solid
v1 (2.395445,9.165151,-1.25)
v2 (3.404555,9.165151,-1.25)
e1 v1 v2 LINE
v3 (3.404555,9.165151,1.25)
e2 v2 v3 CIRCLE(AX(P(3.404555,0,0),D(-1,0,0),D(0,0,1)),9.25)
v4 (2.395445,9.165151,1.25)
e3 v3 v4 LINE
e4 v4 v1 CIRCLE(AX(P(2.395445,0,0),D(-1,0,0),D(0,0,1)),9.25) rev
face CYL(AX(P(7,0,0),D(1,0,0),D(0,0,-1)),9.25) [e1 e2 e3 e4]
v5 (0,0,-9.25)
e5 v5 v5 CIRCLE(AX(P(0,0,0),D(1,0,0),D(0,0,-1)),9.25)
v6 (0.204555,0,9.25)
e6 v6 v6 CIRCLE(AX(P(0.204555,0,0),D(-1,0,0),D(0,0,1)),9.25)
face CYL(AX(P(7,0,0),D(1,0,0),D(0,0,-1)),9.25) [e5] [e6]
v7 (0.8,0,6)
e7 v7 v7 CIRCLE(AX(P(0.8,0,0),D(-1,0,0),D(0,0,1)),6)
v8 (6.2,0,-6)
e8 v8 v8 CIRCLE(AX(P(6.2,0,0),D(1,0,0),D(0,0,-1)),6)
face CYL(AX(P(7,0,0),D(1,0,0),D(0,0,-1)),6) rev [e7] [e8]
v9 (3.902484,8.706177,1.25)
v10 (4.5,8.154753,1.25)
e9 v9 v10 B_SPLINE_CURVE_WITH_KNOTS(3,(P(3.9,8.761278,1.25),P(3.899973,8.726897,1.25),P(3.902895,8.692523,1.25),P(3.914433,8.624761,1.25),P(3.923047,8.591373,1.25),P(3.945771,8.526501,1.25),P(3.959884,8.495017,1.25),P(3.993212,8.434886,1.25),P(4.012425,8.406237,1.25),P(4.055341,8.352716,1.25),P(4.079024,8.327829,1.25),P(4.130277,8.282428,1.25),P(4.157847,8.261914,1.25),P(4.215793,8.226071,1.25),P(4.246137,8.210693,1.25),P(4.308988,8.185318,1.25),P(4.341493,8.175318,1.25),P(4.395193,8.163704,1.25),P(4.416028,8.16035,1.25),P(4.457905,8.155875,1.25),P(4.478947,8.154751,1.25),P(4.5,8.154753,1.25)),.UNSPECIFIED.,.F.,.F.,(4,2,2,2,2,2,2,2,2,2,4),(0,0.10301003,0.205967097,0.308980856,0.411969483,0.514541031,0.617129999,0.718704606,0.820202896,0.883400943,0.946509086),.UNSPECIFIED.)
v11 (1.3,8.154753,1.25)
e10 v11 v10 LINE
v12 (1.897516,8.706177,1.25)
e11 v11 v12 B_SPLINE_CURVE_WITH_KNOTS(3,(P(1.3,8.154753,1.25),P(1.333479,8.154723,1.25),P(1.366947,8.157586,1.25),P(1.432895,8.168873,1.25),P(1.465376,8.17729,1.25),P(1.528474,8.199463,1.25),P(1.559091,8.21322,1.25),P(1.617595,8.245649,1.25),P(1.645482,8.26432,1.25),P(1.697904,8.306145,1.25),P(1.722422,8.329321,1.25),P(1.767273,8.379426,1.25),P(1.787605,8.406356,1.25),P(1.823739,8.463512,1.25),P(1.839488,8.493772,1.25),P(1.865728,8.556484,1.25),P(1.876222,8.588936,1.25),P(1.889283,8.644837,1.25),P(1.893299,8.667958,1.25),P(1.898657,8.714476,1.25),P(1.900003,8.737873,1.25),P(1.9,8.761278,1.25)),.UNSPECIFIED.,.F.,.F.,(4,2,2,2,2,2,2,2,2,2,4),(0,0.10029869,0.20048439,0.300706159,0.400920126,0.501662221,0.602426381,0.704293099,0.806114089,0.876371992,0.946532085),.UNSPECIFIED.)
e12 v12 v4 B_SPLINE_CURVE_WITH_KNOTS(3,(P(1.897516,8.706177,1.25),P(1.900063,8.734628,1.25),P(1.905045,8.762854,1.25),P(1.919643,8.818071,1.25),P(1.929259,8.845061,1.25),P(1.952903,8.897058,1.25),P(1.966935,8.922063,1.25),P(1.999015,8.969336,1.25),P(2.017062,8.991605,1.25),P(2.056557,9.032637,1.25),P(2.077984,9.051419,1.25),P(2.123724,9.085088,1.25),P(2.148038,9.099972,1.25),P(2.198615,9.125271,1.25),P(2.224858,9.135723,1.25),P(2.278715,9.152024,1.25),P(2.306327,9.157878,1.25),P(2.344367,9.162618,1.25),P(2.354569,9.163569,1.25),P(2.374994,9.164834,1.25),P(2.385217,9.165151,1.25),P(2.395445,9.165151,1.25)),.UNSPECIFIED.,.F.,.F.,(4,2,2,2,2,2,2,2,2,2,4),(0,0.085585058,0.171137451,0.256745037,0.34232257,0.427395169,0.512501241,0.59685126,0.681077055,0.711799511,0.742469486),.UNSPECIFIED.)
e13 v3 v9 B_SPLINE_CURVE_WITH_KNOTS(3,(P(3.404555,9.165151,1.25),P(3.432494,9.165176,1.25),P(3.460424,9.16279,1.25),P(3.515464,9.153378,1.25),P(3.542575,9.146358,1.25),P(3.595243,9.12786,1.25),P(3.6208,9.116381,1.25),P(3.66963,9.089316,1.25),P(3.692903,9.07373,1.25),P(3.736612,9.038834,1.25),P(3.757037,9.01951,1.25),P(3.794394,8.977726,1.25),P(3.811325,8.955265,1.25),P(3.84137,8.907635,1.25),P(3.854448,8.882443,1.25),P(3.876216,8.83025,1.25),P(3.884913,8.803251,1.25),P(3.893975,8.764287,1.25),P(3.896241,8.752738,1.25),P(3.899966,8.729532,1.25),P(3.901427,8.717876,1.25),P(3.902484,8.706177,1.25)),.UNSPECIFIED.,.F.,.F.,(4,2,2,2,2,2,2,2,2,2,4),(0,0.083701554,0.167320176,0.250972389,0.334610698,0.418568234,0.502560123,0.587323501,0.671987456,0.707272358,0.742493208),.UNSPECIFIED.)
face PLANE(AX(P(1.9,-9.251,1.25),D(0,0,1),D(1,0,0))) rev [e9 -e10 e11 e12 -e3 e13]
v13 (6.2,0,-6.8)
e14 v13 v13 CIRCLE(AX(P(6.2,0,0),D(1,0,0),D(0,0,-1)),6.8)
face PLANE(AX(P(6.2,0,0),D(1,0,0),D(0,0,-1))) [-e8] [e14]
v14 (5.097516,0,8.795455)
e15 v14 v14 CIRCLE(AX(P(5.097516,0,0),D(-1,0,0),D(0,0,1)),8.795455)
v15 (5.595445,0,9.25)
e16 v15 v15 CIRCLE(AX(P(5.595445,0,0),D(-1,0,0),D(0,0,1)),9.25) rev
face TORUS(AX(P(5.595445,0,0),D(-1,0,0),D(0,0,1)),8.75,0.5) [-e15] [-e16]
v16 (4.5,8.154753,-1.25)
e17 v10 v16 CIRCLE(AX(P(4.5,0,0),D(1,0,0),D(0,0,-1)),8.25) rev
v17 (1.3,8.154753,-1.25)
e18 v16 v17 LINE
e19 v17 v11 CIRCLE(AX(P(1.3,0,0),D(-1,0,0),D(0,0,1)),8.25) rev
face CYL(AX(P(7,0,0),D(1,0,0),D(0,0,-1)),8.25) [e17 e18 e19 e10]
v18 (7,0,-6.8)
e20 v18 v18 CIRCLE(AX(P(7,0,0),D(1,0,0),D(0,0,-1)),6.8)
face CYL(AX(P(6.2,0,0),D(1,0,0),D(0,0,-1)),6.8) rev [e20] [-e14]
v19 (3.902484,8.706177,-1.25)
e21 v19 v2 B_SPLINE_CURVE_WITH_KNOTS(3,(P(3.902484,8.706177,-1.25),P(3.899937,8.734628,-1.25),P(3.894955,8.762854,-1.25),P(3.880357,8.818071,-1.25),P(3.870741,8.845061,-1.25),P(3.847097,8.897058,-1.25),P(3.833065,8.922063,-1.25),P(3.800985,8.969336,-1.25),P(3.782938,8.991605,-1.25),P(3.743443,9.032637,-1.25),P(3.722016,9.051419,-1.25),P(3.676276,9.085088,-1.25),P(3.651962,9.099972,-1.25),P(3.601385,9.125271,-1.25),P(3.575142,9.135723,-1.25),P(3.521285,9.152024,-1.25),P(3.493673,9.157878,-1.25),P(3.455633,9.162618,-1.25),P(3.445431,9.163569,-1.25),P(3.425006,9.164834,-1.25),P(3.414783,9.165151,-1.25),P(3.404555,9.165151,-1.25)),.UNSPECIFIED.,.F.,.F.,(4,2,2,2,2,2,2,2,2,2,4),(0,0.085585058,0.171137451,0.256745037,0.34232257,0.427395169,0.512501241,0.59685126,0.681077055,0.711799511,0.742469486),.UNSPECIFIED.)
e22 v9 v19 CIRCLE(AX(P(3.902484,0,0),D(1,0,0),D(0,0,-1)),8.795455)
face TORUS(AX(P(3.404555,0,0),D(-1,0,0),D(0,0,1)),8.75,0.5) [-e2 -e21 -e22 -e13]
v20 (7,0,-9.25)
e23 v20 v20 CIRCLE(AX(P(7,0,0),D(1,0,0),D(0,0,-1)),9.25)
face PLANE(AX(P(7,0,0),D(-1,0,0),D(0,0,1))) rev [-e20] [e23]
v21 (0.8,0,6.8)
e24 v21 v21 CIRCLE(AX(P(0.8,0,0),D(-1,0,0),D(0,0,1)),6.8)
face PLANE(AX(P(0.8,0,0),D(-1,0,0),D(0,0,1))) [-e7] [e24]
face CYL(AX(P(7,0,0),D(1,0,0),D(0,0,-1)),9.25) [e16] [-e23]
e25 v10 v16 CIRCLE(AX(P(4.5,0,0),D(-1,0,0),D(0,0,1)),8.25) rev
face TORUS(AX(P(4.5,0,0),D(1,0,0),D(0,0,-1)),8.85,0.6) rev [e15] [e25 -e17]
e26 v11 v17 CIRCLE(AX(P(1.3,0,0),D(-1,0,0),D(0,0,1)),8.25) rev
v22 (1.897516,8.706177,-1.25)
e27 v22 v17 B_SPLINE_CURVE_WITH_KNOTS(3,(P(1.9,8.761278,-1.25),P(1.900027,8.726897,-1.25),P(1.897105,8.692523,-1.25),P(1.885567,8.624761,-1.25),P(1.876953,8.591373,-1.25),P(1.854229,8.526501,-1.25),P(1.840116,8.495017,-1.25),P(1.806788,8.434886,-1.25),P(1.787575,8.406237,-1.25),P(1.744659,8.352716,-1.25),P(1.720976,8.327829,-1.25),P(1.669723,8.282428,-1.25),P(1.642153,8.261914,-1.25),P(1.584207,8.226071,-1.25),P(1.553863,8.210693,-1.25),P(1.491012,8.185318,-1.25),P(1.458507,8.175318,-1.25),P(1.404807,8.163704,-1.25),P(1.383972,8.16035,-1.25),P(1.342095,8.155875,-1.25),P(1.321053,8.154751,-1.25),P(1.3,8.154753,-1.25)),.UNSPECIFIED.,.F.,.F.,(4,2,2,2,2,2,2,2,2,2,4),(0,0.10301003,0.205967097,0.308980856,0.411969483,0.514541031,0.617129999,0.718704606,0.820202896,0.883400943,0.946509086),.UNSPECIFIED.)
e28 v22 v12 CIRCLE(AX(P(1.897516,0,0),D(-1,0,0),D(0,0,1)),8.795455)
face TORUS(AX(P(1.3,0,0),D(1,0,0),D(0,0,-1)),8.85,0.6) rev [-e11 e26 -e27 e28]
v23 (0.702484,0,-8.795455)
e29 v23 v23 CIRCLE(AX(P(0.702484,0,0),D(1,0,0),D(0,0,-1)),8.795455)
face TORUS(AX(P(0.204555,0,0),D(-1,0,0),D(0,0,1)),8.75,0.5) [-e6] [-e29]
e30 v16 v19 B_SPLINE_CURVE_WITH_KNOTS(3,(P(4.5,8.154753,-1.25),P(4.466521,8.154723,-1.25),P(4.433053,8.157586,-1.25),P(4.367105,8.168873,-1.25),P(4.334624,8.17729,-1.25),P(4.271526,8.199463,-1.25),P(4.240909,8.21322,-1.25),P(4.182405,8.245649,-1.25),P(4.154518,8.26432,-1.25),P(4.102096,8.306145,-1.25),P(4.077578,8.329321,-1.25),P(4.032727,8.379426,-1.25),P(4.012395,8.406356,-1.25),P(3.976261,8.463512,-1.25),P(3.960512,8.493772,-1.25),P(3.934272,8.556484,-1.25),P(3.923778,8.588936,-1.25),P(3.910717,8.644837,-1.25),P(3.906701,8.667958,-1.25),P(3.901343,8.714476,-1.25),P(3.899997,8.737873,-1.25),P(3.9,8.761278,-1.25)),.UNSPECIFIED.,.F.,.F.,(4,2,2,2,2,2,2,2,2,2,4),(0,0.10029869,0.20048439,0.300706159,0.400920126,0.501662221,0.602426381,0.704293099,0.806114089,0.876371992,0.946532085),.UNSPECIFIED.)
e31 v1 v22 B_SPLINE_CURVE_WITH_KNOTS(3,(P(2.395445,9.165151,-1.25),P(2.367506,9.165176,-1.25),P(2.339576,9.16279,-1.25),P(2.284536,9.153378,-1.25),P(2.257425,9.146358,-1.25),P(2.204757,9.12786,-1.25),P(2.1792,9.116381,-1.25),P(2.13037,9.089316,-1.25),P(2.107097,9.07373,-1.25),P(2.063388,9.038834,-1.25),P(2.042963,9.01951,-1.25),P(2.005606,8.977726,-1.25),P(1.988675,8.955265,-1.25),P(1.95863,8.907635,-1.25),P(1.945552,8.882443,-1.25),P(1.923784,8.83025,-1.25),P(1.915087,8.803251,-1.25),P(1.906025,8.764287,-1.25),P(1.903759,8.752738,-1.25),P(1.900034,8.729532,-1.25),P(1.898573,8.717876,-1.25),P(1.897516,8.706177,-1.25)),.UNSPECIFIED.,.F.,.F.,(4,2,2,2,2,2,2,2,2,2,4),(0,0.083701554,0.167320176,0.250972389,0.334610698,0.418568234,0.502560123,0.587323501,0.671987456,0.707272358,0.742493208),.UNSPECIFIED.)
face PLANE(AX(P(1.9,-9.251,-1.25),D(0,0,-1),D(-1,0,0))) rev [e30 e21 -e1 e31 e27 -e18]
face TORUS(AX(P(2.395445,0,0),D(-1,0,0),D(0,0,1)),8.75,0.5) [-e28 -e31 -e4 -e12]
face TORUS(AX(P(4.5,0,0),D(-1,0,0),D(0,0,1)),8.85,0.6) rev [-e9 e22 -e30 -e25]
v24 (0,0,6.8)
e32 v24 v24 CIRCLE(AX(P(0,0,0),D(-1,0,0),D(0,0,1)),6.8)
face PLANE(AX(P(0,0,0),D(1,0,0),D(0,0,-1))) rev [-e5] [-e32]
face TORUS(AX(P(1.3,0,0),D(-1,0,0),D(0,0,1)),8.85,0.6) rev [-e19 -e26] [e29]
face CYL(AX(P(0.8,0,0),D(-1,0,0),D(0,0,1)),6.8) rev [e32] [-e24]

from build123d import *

# Parameters (mm, degrees)
CUT_EXTRUDE3_REACH      = 24.475
CUT_EXTRUDE3_END_RADIUS = 8.25
SKETCH7_W               = 2
SKETCH7_H               = 2.5
FILLET1_R               = 0.6
SKETCH3_R               = 6.8
CUT_EXTRUDE1_DEPTH      = 0.8
CUT_EXTRUDE2_START      = -0.8
SKETCH4_R               = 6.8
CUT_EXTRUDE2_DEPTH      = 0.8
FILLET2_R               = 0.5


with BuildPart() as part:
    # Sketch2 → Revolve1 (revolve)
    with BuildSketch(Plane(origin=(0, 0, 0), x_dir=(1, 0, 0), z_dir=(0, 1, 0))):
        Polygon((7, 9.25), (7, 6), (0, 6), (0, 9.25), (0.7, 9.25), (0.7, 8.25), (1.9, 8.25), (1.9, 9.25), (3.9, 9.25), (3.9, 8.25), (5.1, 8.25), (5.1, 9.25), align=None)
    revolve(axis=Axis((7, 0, 0), (-1, 0, 0)))

    # Cut-Extrude3: up to this cylinder (the profile starts outside it)
    cut_extrude3_end = Plane(origin=(2.9, 0, 0), z_dir=(1, 0, 0)) * Cylinder(CUT_EXTRUDE3_END_RADIUS, 66.45, mode=Mode.PRIVATE)
    # Sketch7 → Cut-Extrude3 (cut, up to the surface)
    with BuildSketch(Plane(origin=(0, 10, 0), x_dir=(1, 0, 0), z_dir=(0, 1, 0)), mode=Mode.PRIVATE) as cut_extrude3_sk1:
        with Locations((2.9, 0)):
            Rectangle(SKETCH7_W, SKETCH7_H)
    cut_extrude3_tool1 = extrude(cut_extrude3_sk1.sketch, amount=-CUT_EXTRUDE3_REACH, mode=Mode.PRIVATE) - cut_extrude3_end
    add(cut_extrude3_tool1.solids().sort_by_distance((2.9, 10, 0))[0], mode=Mode.SUBTRACT)

    # Fillet1
    fillet1_edges = [part.edges().sort_by_distance(p)[0] for p in [
        (0.7, 0, 8.25),
        (5.1, 0, 8.25),
        (1.9, -6.259992013, 5.373546315),
        (3.9, -6.259992013, 5.373546315),
    ]]
    fillet(fillet1_edges, radius=FILLET1_R - 0.0001)  # a hair under: the kernel refuses the full size

    # Sketch3 → Cut-Extrude1 (cut)
    with BuildSketch(Plane(origin=(7, 0, 0), x_dir=(0, 0, -1), z_dir=(1, 0, 0))):
        Circle(SKETCH3_R)
    extrude(amount=-CUT_EXTRUDE1_DEPTH, mode=Mode.SUBTRACT)

    # Sketch4 → Cut-Extrude2 (cut)
    with BuildSketch(Plane.ZY.offset(CUT_EXTRUDE2_START)):
        with Locations(Location((0, 0, 0), (0, 0, 180))):
            Circle(SKETCH4_R)
    extrude(amount=CUT_EXTRUDE2_DEPTH, mode=Mode.SUBTRACT)

    # Fillet2
    fillet2_edges = [part.edges().sort_by_distance(p)[0] for p in [
        (5.1, 0, 9.25),
        (3.9, -9.25, 0),
        (1.9, -9.25, 0),
        (0.7, 0, 9.25),
    ]]
    fillet(fillet2_edges, radius=FILLET2_R)


solid = part.part
